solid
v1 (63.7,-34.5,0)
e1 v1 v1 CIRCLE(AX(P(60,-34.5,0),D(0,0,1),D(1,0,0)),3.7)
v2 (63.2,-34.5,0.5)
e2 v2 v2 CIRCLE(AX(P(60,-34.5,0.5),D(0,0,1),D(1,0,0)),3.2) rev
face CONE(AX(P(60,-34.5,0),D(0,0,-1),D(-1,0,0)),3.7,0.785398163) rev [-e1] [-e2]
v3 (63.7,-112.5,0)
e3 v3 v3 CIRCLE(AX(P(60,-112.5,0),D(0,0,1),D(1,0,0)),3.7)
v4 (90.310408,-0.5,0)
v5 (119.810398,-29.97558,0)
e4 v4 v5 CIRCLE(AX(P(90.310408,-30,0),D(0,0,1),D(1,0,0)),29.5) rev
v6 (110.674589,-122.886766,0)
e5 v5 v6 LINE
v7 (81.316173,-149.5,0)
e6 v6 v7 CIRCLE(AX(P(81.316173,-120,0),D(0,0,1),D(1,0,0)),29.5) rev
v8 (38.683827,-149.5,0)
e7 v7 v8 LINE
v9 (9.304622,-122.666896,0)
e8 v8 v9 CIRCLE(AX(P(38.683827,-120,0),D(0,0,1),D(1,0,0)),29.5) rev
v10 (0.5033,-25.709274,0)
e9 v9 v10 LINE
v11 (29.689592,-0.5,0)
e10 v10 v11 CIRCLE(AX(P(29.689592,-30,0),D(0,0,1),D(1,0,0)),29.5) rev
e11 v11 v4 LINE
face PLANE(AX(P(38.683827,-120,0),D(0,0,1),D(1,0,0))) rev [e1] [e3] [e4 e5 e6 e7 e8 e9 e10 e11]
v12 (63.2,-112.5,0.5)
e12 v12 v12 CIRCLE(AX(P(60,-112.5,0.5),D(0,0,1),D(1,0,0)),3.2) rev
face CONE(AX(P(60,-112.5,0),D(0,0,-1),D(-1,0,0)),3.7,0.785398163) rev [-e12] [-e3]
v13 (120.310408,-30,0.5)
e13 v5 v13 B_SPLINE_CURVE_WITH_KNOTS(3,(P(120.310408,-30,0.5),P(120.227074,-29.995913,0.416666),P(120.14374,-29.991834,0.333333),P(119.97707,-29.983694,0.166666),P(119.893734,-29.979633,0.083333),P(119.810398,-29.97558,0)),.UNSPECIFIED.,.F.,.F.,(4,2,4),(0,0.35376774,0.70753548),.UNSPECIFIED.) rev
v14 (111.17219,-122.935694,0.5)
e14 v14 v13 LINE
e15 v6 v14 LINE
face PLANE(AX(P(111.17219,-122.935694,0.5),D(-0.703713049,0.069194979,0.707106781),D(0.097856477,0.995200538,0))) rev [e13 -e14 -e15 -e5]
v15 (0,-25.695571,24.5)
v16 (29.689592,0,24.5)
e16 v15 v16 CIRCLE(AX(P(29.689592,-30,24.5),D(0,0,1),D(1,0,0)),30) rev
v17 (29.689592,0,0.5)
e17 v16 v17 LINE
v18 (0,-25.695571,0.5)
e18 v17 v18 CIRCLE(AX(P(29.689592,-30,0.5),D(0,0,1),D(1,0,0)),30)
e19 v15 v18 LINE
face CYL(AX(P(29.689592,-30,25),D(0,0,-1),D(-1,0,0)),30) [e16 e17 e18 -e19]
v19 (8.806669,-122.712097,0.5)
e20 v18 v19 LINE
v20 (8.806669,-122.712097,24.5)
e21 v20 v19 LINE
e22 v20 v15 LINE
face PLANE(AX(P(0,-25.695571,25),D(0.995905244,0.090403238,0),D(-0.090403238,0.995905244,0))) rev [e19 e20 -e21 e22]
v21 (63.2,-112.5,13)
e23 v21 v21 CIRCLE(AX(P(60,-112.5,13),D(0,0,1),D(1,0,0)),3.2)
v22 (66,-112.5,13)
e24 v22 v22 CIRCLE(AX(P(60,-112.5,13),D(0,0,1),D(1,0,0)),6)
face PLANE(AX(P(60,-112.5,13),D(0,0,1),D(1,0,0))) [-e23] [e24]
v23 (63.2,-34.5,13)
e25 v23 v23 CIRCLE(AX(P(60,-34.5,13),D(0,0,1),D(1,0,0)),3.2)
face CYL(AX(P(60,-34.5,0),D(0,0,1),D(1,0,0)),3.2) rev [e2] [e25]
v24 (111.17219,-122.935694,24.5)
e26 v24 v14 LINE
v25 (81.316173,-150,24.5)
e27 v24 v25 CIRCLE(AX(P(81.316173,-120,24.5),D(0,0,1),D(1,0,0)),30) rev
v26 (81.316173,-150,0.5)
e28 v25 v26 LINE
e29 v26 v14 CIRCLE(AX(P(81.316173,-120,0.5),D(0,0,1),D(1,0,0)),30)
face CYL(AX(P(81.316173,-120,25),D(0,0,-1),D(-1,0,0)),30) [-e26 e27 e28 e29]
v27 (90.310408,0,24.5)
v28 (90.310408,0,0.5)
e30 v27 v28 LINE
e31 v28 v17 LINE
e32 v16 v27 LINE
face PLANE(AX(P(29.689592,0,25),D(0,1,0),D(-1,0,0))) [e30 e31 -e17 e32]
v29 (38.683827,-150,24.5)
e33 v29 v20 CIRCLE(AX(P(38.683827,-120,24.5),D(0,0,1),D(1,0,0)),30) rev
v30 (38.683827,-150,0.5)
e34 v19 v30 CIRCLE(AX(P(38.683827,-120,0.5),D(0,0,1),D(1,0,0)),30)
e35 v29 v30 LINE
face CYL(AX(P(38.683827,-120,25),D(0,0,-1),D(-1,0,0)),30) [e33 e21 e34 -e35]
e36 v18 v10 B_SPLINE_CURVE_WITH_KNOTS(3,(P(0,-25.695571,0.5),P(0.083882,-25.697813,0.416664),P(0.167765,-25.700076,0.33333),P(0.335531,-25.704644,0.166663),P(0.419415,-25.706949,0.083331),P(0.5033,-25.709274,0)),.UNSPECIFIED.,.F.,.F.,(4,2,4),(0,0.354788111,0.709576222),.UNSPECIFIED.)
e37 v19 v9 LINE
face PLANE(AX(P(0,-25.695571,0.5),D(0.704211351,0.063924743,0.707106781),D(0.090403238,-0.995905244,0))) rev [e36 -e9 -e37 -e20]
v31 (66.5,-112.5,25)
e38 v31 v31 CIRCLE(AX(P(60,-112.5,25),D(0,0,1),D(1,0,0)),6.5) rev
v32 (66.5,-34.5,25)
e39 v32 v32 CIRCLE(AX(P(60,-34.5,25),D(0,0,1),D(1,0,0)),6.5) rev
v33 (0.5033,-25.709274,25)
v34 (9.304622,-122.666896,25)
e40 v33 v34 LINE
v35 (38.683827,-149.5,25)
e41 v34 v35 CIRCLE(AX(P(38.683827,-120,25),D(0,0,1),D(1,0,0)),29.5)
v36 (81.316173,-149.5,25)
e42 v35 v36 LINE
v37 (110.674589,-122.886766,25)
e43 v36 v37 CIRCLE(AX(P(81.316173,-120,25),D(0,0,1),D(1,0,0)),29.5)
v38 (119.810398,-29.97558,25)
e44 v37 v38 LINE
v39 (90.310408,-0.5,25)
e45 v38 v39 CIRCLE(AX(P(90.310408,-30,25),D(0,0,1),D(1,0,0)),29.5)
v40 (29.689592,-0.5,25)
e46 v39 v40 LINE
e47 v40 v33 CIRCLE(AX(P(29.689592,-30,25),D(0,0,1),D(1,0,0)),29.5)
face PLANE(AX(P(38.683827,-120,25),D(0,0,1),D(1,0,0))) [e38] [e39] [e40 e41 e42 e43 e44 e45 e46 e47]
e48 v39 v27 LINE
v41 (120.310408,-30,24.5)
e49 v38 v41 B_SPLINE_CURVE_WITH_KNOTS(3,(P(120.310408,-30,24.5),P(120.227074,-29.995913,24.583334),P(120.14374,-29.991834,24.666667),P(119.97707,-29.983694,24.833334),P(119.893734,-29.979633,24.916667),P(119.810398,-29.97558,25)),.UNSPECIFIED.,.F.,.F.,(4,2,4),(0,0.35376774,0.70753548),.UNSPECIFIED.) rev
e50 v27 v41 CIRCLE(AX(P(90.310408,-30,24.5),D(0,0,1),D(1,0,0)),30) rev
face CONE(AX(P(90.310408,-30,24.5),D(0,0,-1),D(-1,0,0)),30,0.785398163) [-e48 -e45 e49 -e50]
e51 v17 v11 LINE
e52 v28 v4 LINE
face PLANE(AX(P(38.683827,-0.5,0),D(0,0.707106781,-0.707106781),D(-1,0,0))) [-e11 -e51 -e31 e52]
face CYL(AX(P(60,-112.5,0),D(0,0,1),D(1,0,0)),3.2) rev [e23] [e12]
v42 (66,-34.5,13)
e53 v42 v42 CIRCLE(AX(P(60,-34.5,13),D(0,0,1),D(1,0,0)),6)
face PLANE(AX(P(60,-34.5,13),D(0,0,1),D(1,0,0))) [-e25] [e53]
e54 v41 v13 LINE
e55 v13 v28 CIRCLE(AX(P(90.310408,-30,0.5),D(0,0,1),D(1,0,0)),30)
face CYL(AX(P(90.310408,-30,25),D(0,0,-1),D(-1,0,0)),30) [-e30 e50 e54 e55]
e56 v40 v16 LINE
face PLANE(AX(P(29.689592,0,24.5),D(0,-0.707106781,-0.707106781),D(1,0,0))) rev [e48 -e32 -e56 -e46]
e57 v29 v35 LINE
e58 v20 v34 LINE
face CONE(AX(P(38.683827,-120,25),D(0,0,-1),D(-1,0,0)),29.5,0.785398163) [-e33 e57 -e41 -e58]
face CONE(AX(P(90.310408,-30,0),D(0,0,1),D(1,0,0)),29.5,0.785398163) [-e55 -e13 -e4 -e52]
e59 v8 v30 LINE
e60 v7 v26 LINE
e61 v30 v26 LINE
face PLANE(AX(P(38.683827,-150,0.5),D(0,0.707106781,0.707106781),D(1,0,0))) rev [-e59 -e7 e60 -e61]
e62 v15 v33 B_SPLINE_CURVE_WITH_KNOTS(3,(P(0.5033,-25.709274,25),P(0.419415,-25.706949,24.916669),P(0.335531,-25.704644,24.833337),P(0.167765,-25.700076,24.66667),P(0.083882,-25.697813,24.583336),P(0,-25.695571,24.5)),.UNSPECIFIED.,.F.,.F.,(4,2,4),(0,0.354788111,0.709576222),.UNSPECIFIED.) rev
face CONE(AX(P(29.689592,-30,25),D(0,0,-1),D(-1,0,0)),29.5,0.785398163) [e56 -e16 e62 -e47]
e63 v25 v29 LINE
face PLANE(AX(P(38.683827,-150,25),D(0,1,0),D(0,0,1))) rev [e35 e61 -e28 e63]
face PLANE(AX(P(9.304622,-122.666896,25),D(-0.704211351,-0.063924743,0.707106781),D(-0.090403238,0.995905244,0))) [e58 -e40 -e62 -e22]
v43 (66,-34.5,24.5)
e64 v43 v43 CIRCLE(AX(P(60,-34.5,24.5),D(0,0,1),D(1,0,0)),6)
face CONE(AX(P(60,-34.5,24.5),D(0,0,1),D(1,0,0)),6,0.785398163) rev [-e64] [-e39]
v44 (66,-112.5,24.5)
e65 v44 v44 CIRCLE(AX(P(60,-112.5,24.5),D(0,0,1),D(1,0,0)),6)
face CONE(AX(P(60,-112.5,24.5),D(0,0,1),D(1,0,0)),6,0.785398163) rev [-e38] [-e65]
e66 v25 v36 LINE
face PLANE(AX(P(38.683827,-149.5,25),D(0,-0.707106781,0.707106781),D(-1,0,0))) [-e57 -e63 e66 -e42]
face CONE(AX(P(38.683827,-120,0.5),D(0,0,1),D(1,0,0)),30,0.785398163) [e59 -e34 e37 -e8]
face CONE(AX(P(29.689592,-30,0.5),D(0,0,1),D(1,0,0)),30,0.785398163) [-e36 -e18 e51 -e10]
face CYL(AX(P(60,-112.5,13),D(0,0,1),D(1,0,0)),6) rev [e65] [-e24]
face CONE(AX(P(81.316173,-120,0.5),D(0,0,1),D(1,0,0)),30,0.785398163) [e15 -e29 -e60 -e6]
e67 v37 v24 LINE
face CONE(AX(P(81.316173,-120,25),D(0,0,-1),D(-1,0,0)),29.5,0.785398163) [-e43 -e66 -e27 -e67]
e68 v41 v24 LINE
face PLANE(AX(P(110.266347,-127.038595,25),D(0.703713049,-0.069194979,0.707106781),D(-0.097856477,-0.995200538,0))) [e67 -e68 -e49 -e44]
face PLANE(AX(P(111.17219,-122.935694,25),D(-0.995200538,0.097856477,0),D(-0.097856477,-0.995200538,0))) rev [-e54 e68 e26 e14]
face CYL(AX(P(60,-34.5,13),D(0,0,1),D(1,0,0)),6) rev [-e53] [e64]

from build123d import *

# Parameters (mm, degrees)
BOSS_EXTRUDE1_DEPTH = 25
SKETCH4_R           = 6
CUT_EXTRUDE1_DEPTH  = 12
SKETCH5_R           = 3.2
CUT_EXTRUDE2_DEPTH  = 193.726734542
CHAMFER1_SIZE       = 0.5


with BuildPart() as part:
    # Sketch3 → Boss-Extrude1 (new body)
    with BuildSketch(Plane.XY):
        with BuildLine():
            Line((0, -25.695570819), (8.806669266, -122.712097135))
            ThreePointArc((8.806669266, -122.712097135), (18.452204227, -142.151330818), (38.683826579, -150))
            Line((38.683826579, -150), (81.316173421, -150))
            ThreePointArc((81.316173421, -150), (101.46473628, -142.226907448), (111.172189547, -122.935694313))
            Line((111.172189547, -122.935694313), (120.310407726, -30))
            ThreePointArc((120.310407726, -30), (111.523611161, -8.786796564), (90.310407726, 0))
            Line((90.310407726, 0), (29.689592274, 0))
            ThreePointArc((29.689592274, 0), (10.057130323, -7.315943094), (0, -25.695570819))
        make_face()
    extrude(amount=BOSS_EXTRUDE1_DEPTH)

    # Sketch4 → Cut-Extrude1 (cut)
    with BuildSketch(Plane.XY.offset(25)):
        with Locations((60, -34.5)):
            Circle(SKETCH4_R)
        with Locations((60, -112.5)):
            Circle(SKETCH4_R)
    extrude(amount=-CUT_EXTRUDE1_DEPTH, mode=Mode.SUBTRACT)

    # Sketch5 → Cut-Extrude2 (cut, through all)
    with BuildSketch(Plane.XY.offset(13)):
        with Locations((60, -34.5)):
            Circle(SKETCH5_R)
        with Locations((60, -112.5)):
            Circle(SKETCH5_R)
    extrude(amount=-CUT_EXTRUDE2_DEPTH, mode=Mode.SUBTRACT)

    # Chamfer1
    # the kernel refuses this chamfer: 0.5 mm, written as the material it takes off along each edge
    with BuildSketch(Plane(origin=(81.316173421, -120, 0), x_dir=(0, -1, 0), z_dir=(-1, 0, 0))) as chamfer1_piece_1:
        Polygon((30 - CHAMFER1_SIZE, 0), (30, CHAMFER1_SIZE), (30, 0), align=None)
    revolve(axis=Axis((81.316173421, -120, 0), (0, 0, 1)), revolution_arc=84.384249791, mode=Mode.SUBTRACT)
    with BuildSketch(Plane(origin=(38.683826579, -150, 0), x_dir=(0, 0.9996219169112968, -0.027495876610586483), z_dir=(1, 0, 0))) as chamfer1_piece_2:
        Polygon((CHAMFER1_SIZE * 0.999621916911, CHAMFER1_SIZE * 0.0274958766106), (-CHAMFER1_SIZE * 0.0274958766106, CHAMFER1_SIZE * 0.999621916911), (0, 0), align=None)
    extrude(amount=42.632346842, mode=Mode.SUBTRACT)
    with BuildSketch(Plane(origin=(38.683826579, -120, 0), x_dir=(-0.9959052437808521, -0.09040323782808642, 0), z_dir=(-0.09040323782808642, 0.9959052437808521, 0))) as chamfer1_piece_3:
        Polygon((30, CHAMFER1_SIZE), (30 - CHAMFER1_SIZE, 0), (30, 0), align=None)
    revolve(axis=Axis((38.683826579, -120, 0), (0, 0, 1)), revolution_arc=84.813194516, mode=Mode.SUBTRACT)
    with BuildSketch(Plane(origin=(-0.116244234, -24.414994532, 0), x_dir=(-0.027383287698834344, -0.0024857162725187313, 0.9996219169112968), z_dir=(0.09040323782809233, -0.9959052437808515, 0))) as chamfer1_piece_4:
        Polygon((CHAMFER1_SIZE * 0.999621916911, -CHAMFER1_SIZE * 0.0274958766106), (-CHAMFER1_SIZE * 0.0274958766106, -CHAMFER1_SIZE * 0.999621916911), (0, 0), align=None)
    extrude(amount=98.701260202, mode=Mode.SUBTRACT)
    with BuildSketch(Plane(origin=(38.683826579, -150, 25), x_dir=(0, 0.9996219169112968, 0.027495876610589196), z_dir=(1, 0, 0))) as chamfer1_piece_5:
        Polygon((CHAMFER1_SIZE * 0.999621916911, -CHAMFER1_SIZE * 0.0274958766106), (-CHAMFER1_SIZE * 0.0274958766106, -CHAMFER1_SIZE * 0.999621916911), (0, 0), align=None)
    extrude(amount=42.632346842, mode=Mode.SUBTRACT)
    with BuildSketch(Plane(origin=(81.316173421, -120, 25), x_dir=(0, -1, 0), z_dir=(-1, 0, 0))) as chamfer1_piece_6:
        Polygon((30 - CHAMFER1_SIZE, 0), (30, -CHAMFER1_SIZE), (30, 0), align=None)
    revolve(axis=Axis((81.316173421, -120, 25), (0, 0, 1)), revolution_arc=84.384249791, mode=Mode.SUBTRACT)
    with BuildSketch(Plane(origin=(111.172189547, -122.935694313, 25), x_dir=(-0.9948242690303891, 0.09781947923377807, 0.027495876610589255), z_dir=(0.09785647711289452, 0.9952005375234951, 0))) as chamfer1_piece_7:
        Polygon((CHAMFER1_SIZE * 0.999621916911, -CHAMFER1_SIZE * 0.0274958766106), (-CHAMFER1_SIZE * 0.0274958766106, -CHAMFER1_SIZE * 0.999621916911), (0, 0), align=None)
    extrude(amount=94.669728268, mode=Mode.SUBTRACT)
    with BuildSketch(Plane(origin=(90.310407726, -30, 25), x_dir=(0.9990808536319631, -0.04286546285796977, 0), z_dir=(-0.04286546285796977, -0.9990808536319631, 0))) as chamfer1_piece_8:
        Polygon((30 - CHAMFER1_SIZE, 0), (30, -CHAMFER1_SIZE), (30, 0), align=None)
    revolve(axis=Axis((90.310407726, -30, 25), (0, 0, 1)), revolution_arc=92.456762863, mode=Mode.SUBTRACT)
    with BuildSketch(Plane(origin=(60, -34.5, 25), x_dir=(1, 0, 0), z_dir=(0, -1, 0))) as chamfer1_piece_9:
        Polygon((6 + CHAMFER1_SIZE, 0), (6, -CHAMFER1_SIZE), (6, 0), align=None)
    revolve(axis=Axis((60, -34.5, 25), (0, 0, 1)), mode=Mode.SUBTRACT)
    with BuildSketch(Plane(origin=(90.310407726, 0, 25), x_dir=(0, -0.9996219169112968, 0.027495876610589425), z_dir=(-1, 0, 0))) as chamfer1_piece_10:
        Polygon((CHAMFER1_SIZE * 0.999621916911, -CHAMFER1_SIZE * 0.0274958766106), (-CHAMFER1_SIZE * 0.0274958766106, -CHAMFER1_SIZE * 0.999621916911), (0, 0), align=None)
    extrude(amount=60.620815451, mode=Mode.SUBTRACT)
    with BuildSketch(Plane(origin=(60, -112.5, 25), x_dir=(1, 0, 0), z_dir=(0, -1, 0))) as chamfer1_piece_11:
        Polygon((6 + CHAMFER1_SIZE, 0), (6, -CHAMFER1_SIZE), (6, 0), align=None)
    revolve(axis=Axis((60, -112.5, 25), (0, 0, 1)), mode=Mode.SUBTRACT)
    with BuildSketch(Plane(origin=(29.689592274, -30, 25), x_dir=(0, 1, 0), z_dir=(1, 0, 0))) as chamfer1_piece_12:
        Polygon((30, -CHAMFER1_SIZE), (30 - CHAMFER1_SIZE, 0), (30, 0), align=None)
    revolve(axis=Axis((29.689592274, -30, 25), (0, 0, 1)), revolution_arc=84.2072647, mode=Mode.SUBTRACT)
    with BuildSketch(Plane(origin=(60, -34.5, 0), x_dir=(1, 0, 0), z_dir=(0, -1, 0))) as chamfer1_piece_13:
        Polygon((3.2 + CHAMFER1_SIZE, 0), (3.2, CHAMFER1_SIZE), (3.2, 0), align=None)
    revolve(axis=Axis((60, -34.5, 0), (0, 0, 1)), mode=Mode.SUBTRACT)
    with BuildSketch(Plane(origin=(60, -112.5, 0), x_dir=(1, 0, 0), z_dir=(0, -1, 0))) as chamfer1_piece_14:
        Polygon((3.2 + CHAMFER1_SIZE, 0), (3.2, CHAMFER1_SIZE), (3.2, 0), align=None)
    revolve(axis=Axis((60, -112.5, 0), (0, 0, 1)), mode=Mode.SUBTRACT)
    with BuildSketch(Plane(origin=(-0.116244234, -24.414994532, 25), x_dir=(-0.027383287698834274, -0.002485716272518725, -0.9996219169112968), z_dir=(0.09040323782809233, -0.9959052437808515, 0))) as chamfer1_piece_15:
        Polygon((CHAMFER1_SIZE * 0.999621916911, CHAMFER1_SIZE * 0.0274958766106), (-CHAMFER1_SIZE * 0.0274958766106, CHAMFER1_SIZE * 0.999621916911), (0, 0), align=None)
    extrude(amount=98.701260202, mode=Mode.SUBTRACT)
    with BuildSketch(Plane(origin=(29.689592274, -30, 0), x_dir=(0, 1, 0), z_dir=(1, 0, 0))) as chamfer1_piece_16:
        Polygon((30, CHAMFER1_SIZE), (30 - CHAMFER1_SIZE, 0), (30, 0), align=None)
    revolve(axis=Axis((29.689592274, -30, 0), (0, 0, 1)), revolution_arc=84.2072647, mode=Mode.SUBTRACT)
    with BuildSketch(Plane(origin=(38.683826579, -120, 25), x_dir=(-0.9959052437808521, -0.09040323782808642, 0), z_dir=(-0.09040323782808642, 0.9959052437808521, 0))) as chamfer1_piece_17:
        Polygon((30, -CHAMFER1_SIZE), (30 - CHAMFER1_SIZE, 0), (30, 0), align=None)
    revolve(axis=Axis((38.683826579, -120, 25), (0, 0, 1)), revolution_arc=84.813194516, mode=Mode.SUBTRACT)
    with BuildSketch(Plane(origin=(90.310407726, 0, 0), x_dir=(0, -0.9996219169112968, -0.027495876610586893), z_dir=(-1, 0, 0))) as chamfer1_piece_18:
        Polygon((CHAMFER1_SIZE * 0.999621916911, CHAMFER1_SIZE * 0.0274958766106), (-CHAMFER1_SIZE * 0.0274958766106, CHAMFER1_SIZE * 0.999621916911), (0, 0), align=None)
    extrude(amount=60.620815451, mode=Mode.SUBTRACT)
    with BuildSketch(Plane(origin=(90.310407726, -30, 0), x_dir=(0.9990808536319631, -0.04286546285796977, 0), z_dir=(-0.04286546285796977, -0.9990808536319631, 0))) as chamfer1_piece_19:
        Polygon((30 - CHAMFER1_SIZE, 0), (30, CHAMFER1_SIZE), (30, 0), align=None)
    revolve(axis=Axis((90.310407726, -30, 0), (0, 0, 1)), revolution_arc=92.456762863, mode=Mode.SUBTRACT)
    with BuildSketch(Plane(origin=(111.172189547, -122.935694313, 0), x_dir=(-0.9948242690303891, 0.09781947923377807, -0.02749587661058666), z_dir=(0.09785647711289452, 0.9952005375234951, 0))) as chamfer1_piece_20:
        Polygon((CHAMFER1_SIZE * 0.999621916911, CHAMFER1_SIZE * 0.0274958766106), (-CHAMFER1_SIZE * 0.0274958766106, CHAMFER1_SIZE * 0.999621916911), (0, 0), align=None)
    extrude(amount=94.669728268, mode=Mode.SUBTRACT)


solid = part.part
